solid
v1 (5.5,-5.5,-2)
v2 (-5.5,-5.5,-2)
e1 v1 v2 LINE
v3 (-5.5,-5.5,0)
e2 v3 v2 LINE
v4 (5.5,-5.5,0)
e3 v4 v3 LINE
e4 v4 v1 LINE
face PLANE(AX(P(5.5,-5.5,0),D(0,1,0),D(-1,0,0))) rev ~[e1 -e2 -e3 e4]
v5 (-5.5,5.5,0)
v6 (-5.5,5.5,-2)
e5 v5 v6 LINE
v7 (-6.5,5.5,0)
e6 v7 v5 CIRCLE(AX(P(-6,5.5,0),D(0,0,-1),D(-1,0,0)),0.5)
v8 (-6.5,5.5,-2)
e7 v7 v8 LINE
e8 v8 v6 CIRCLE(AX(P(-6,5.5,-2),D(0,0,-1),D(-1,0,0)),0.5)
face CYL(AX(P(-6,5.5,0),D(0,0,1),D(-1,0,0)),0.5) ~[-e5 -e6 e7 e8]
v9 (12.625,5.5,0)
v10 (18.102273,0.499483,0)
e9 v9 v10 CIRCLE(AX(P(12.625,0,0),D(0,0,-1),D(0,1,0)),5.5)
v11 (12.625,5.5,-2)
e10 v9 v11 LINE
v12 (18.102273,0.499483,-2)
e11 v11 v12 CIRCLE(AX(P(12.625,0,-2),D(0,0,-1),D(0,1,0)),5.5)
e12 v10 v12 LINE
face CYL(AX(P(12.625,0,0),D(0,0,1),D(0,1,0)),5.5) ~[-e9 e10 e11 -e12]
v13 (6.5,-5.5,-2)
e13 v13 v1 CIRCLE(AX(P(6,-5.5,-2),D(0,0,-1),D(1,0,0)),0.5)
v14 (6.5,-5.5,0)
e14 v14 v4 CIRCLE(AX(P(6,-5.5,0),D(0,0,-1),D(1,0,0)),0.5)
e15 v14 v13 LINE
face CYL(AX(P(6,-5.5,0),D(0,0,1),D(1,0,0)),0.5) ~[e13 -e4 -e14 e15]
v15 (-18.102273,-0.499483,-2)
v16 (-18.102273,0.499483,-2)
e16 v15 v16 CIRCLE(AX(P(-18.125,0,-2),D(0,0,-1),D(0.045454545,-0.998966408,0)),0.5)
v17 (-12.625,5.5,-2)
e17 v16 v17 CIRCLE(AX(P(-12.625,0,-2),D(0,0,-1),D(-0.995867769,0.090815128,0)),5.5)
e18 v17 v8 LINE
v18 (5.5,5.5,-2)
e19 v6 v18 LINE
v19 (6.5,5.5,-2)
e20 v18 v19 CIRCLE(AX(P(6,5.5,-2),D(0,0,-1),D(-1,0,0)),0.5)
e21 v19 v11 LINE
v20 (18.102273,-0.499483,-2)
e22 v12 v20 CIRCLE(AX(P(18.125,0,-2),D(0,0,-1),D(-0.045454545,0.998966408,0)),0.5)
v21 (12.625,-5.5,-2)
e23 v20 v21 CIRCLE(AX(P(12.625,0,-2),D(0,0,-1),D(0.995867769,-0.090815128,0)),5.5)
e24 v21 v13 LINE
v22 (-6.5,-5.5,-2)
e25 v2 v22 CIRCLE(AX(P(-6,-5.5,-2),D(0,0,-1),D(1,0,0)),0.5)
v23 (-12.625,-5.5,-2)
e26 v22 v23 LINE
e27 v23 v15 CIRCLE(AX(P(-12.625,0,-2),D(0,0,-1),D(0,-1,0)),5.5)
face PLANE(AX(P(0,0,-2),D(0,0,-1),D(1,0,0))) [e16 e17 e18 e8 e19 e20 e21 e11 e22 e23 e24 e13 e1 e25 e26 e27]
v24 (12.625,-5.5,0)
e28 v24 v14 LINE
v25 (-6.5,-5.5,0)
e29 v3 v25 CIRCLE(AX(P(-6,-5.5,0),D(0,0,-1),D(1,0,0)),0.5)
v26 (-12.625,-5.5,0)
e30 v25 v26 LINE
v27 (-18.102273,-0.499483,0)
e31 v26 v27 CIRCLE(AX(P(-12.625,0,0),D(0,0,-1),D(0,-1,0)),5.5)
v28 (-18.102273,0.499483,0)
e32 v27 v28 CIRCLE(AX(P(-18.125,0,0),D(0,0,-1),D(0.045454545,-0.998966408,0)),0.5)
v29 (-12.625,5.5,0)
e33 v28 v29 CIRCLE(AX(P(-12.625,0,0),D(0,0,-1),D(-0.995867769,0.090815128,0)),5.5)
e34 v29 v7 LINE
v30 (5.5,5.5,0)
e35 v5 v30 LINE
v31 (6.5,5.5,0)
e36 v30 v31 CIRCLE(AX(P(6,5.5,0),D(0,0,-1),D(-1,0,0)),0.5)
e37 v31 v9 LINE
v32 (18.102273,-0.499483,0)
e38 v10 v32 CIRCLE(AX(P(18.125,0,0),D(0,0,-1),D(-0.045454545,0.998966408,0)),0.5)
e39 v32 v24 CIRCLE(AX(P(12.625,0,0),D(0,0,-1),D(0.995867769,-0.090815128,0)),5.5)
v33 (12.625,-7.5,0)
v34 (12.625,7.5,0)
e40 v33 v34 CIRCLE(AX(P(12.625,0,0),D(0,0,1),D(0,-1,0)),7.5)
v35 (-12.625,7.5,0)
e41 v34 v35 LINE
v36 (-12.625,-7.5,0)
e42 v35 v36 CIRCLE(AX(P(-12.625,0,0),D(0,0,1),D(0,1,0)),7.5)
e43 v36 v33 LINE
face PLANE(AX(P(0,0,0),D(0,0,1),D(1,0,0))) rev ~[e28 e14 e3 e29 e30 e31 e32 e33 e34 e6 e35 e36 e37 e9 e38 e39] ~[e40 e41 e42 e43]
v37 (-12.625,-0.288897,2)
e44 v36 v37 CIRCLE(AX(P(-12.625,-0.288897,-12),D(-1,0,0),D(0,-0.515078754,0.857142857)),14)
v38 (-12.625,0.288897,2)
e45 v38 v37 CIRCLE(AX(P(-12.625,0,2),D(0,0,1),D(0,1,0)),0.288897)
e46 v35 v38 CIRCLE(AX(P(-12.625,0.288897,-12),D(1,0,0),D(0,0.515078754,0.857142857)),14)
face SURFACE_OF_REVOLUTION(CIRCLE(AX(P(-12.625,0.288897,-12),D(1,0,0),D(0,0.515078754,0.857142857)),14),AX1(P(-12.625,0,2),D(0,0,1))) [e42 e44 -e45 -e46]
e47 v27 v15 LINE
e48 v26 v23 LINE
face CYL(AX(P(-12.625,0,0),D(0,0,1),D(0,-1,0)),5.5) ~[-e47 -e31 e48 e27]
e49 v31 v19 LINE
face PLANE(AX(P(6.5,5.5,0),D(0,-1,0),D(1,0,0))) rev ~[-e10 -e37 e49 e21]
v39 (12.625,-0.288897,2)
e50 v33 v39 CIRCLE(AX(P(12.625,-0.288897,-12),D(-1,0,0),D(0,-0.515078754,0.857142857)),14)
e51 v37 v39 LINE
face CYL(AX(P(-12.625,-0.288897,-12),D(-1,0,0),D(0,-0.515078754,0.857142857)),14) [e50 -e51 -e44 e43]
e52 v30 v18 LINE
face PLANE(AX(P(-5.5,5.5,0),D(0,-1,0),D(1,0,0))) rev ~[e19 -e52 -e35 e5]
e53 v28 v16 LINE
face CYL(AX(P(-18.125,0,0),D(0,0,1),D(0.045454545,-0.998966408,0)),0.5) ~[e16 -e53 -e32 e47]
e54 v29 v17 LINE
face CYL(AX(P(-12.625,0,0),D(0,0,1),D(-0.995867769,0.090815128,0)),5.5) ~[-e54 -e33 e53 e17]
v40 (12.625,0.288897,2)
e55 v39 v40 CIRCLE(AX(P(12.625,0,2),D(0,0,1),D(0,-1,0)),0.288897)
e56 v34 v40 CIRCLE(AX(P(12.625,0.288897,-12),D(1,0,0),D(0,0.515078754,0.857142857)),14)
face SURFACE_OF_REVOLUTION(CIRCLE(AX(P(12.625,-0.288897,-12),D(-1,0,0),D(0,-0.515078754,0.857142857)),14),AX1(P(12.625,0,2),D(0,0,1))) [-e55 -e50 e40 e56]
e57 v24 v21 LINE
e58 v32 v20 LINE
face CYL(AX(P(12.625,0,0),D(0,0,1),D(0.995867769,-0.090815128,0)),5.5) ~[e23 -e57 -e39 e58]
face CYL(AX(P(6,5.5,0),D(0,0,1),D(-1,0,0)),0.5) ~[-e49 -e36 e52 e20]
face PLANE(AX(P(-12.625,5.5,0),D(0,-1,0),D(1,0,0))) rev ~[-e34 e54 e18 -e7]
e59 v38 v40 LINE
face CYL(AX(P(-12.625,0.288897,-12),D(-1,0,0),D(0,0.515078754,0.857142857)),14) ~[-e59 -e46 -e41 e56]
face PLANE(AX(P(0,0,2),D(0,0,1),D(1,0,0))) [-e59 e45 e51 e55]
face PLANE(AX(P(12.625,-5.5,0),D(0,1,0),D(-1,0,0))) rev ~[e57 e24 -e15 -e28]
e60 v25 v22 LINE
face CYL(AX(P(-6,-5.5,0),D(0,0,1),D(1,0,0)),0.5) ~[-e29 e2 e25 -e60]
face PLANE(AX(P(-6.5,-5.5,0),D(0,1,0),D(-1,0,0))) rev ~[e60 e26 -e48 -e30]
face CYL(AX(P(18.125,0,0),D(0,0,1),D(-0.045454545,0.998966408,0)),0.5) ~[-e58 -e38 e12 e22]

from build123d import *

# Parameters (mm, degrees)
F1_DEPTH    = 2
F2_T1_DEPTH = 25.25
F2_T4_ANGLE = 180
F2_T6_ANGLE = 180
F4_DEPTH    = 2


# Not quite as in the source:
# - a fillet or chamfer that OpenCascade refuses, or shapes differently, is made with other operations: its cross-section is extruded or revolved along the edge and cut away or added


with BuildPart() as f1:
    # F0 (on Top) → F1 (new body)
    with BuildSketch(Plane.XY):
        with BuildLine():
            Line((-12.625, -7.5), (12.625, -7.5))
            ThreePointArc((12.625, -7.5), (20.125, 0), (12.625, 7.5))
            Line((12.625, 7.5), (-12.625, 7.5))
            ThreePointArc((-12.625, 7.5), (-20.125, 0), (-12.625, -7.5))
        make_face()
    extrude(amount=F1_DEPTH)

    # F2: fillet of radius 14 on 1 edges, made by hand

    # F2_s2 → F2_t1 (cut)
    with BuildSketch(Plane.YZ.offset(-12.625)):
        with BuildLine():
            ThreePointArc((7.5, 0), (4.0305548358, 1.4907375632), (0.2888974491, 2))
            Line((0.2888974491, 2), (0.2888974491, 2.28))
            Line((0.2888974491, 2.28), (7.5, 2.28))
            Line((7.5, 2.28), (7.78, 2))
            ThreePointArc((7.78, 2), (7.78, 1), (7.644222051, 0.24))
            Line((7.644222051, 0.24), (7.5, 0))
        make_face()
        with BuildLine():
            ThreePointArc((-7.5, 0), (-4.0305548358, 1.4907375632), (-0.2888974491, 2))
            Line((-0.2888974491, 2), (-0.2888974491, 2.28))
            Line((-0.2888974491, 2.28), (-7.5, 2.28))
            Line((-7.5, 2.28), (-7.78, 2))
            ThreePointArc((-7.78, 2), (-7.78, 1), (-7.644222051, 0.24))
            Line((-7.644222051, 0.24), (-7.5, 0))
        make_face()
    extrude(amount=F2_T1_DEPTH, mode=Mode.SUBTRACT)

    # F2_s3 → F2_t4 (revolve, cut)
    with BuildSketch(Plane.YZ.offset(12.625)):
        with BuildLine():
            ThreePointArc((-7.5, 0), (-4.0305548358, 1.4907375632), (-0.2888974491, 2))
            Line((-0.2888974491, 2), (-0.2888974491, 2.28))
            Line((-0.2888974491, 2.28), (-7.5, 2.28))
            Line((-7.5, 2.28), (-7.78, 2))
            ThreePointArc((-7.78, 2), (-7.78, 1), (-7.644222051, 0.24))
            Line((-7.644222051, 0.24), (-7.5, 0))
        make_face()
    revolve(axis=Axis((12.625, 0, 2), (0, 0, 1)), revolution_arc=F2_T4_ANGLE, mode=Mode.SUBTRACT)

    # F2_s5 → F2_t6 (revolve, cut)
    with BuildSketch(Plane.YZ.offset(-12.625)):
        with BuildLine():
            ThreePointArc((7.5, 0), (4.0305548358, 1.4907375632), (0.2888974491, 2))
            Line((0.2888974491, 2), (0.2888974491, 2.28))
            Line((0.2888974491, 2.28), (7.5, 2.28))
            Line((7.5, 2.28), (7.78, 2))
            ThreePointArc((7.78, 2), (7.78, 1), (7.644222051, 0.24))
            Line((7.644222051, 0.24), (7.5, 0))
        make_face()
    revolve(axis=Axis((-12.625, 0, 2), (0, 0, 1)), revolution_arc=F2_T6_ANGLE, mode=Mode.SUBTRACT)

    # F3 (on face) → F4 (join)
    with BuildSketch(Plane(origin=(0, 0, 0), x_dir=(1, 0, 0), z_dir=(0, 0, -1))):
        with BuildLine():
            ThreePointArc((18.1022727273, 0.499483204), (16.3332908717, 4.0618442623), (12.625, 5.5))
            Line((12.625, 5.5), (6.5, 5.5))
            ThreePointArc((6.5, 5.5), (6, 6), (5.5, 5.5))
            Line((5.5, 5.5), (-5.5, 5.5))
            ThreePointArc((-5.5, 5.5), (-6, 6), (-6.5, 5.5))
            Line((-6.5, 5.5), (-12.625, 5.5))
            ThreePointArc((-12.625, 5.5), (-16.3332908717, 4.0618442623), (-18.1022727273, 0.499483204))
            ThreePointArc((-18.1022727273, 0.499483204), (-18.625, 0), (-18.1022727273, -0.499483204))
            ThreePointArc((-18.1022727273, -0.499483204), (-16.3332908717, -4.0618442623), (-12.625, -5.5))
            Line((-12.625, -5.5), (-6.5, -5.5))
            ThreePointArc((-6.5, -5.5), (-6, -6), (-5.5, -5.5))
            Line((-5.5, -5.5), (5.5, -5.5))
            ThreePointArc((5.5, -5.5), (6, -6), (6.5, -5.5))
            Line((6.5, -5.5), (12.625, -5.5))
            ThreePointArc((12.625, -5.5), (16.3332908717, -4.0618442623), (18.1022727273, -0.499483204))
            ThreePointArc((18.1022727273, -0.499483204), (18.625, 0), (18.1022727273, 0.499483204))
        make_face()
    extrude(amount=F4_DEPTH)


solid = f1.part
